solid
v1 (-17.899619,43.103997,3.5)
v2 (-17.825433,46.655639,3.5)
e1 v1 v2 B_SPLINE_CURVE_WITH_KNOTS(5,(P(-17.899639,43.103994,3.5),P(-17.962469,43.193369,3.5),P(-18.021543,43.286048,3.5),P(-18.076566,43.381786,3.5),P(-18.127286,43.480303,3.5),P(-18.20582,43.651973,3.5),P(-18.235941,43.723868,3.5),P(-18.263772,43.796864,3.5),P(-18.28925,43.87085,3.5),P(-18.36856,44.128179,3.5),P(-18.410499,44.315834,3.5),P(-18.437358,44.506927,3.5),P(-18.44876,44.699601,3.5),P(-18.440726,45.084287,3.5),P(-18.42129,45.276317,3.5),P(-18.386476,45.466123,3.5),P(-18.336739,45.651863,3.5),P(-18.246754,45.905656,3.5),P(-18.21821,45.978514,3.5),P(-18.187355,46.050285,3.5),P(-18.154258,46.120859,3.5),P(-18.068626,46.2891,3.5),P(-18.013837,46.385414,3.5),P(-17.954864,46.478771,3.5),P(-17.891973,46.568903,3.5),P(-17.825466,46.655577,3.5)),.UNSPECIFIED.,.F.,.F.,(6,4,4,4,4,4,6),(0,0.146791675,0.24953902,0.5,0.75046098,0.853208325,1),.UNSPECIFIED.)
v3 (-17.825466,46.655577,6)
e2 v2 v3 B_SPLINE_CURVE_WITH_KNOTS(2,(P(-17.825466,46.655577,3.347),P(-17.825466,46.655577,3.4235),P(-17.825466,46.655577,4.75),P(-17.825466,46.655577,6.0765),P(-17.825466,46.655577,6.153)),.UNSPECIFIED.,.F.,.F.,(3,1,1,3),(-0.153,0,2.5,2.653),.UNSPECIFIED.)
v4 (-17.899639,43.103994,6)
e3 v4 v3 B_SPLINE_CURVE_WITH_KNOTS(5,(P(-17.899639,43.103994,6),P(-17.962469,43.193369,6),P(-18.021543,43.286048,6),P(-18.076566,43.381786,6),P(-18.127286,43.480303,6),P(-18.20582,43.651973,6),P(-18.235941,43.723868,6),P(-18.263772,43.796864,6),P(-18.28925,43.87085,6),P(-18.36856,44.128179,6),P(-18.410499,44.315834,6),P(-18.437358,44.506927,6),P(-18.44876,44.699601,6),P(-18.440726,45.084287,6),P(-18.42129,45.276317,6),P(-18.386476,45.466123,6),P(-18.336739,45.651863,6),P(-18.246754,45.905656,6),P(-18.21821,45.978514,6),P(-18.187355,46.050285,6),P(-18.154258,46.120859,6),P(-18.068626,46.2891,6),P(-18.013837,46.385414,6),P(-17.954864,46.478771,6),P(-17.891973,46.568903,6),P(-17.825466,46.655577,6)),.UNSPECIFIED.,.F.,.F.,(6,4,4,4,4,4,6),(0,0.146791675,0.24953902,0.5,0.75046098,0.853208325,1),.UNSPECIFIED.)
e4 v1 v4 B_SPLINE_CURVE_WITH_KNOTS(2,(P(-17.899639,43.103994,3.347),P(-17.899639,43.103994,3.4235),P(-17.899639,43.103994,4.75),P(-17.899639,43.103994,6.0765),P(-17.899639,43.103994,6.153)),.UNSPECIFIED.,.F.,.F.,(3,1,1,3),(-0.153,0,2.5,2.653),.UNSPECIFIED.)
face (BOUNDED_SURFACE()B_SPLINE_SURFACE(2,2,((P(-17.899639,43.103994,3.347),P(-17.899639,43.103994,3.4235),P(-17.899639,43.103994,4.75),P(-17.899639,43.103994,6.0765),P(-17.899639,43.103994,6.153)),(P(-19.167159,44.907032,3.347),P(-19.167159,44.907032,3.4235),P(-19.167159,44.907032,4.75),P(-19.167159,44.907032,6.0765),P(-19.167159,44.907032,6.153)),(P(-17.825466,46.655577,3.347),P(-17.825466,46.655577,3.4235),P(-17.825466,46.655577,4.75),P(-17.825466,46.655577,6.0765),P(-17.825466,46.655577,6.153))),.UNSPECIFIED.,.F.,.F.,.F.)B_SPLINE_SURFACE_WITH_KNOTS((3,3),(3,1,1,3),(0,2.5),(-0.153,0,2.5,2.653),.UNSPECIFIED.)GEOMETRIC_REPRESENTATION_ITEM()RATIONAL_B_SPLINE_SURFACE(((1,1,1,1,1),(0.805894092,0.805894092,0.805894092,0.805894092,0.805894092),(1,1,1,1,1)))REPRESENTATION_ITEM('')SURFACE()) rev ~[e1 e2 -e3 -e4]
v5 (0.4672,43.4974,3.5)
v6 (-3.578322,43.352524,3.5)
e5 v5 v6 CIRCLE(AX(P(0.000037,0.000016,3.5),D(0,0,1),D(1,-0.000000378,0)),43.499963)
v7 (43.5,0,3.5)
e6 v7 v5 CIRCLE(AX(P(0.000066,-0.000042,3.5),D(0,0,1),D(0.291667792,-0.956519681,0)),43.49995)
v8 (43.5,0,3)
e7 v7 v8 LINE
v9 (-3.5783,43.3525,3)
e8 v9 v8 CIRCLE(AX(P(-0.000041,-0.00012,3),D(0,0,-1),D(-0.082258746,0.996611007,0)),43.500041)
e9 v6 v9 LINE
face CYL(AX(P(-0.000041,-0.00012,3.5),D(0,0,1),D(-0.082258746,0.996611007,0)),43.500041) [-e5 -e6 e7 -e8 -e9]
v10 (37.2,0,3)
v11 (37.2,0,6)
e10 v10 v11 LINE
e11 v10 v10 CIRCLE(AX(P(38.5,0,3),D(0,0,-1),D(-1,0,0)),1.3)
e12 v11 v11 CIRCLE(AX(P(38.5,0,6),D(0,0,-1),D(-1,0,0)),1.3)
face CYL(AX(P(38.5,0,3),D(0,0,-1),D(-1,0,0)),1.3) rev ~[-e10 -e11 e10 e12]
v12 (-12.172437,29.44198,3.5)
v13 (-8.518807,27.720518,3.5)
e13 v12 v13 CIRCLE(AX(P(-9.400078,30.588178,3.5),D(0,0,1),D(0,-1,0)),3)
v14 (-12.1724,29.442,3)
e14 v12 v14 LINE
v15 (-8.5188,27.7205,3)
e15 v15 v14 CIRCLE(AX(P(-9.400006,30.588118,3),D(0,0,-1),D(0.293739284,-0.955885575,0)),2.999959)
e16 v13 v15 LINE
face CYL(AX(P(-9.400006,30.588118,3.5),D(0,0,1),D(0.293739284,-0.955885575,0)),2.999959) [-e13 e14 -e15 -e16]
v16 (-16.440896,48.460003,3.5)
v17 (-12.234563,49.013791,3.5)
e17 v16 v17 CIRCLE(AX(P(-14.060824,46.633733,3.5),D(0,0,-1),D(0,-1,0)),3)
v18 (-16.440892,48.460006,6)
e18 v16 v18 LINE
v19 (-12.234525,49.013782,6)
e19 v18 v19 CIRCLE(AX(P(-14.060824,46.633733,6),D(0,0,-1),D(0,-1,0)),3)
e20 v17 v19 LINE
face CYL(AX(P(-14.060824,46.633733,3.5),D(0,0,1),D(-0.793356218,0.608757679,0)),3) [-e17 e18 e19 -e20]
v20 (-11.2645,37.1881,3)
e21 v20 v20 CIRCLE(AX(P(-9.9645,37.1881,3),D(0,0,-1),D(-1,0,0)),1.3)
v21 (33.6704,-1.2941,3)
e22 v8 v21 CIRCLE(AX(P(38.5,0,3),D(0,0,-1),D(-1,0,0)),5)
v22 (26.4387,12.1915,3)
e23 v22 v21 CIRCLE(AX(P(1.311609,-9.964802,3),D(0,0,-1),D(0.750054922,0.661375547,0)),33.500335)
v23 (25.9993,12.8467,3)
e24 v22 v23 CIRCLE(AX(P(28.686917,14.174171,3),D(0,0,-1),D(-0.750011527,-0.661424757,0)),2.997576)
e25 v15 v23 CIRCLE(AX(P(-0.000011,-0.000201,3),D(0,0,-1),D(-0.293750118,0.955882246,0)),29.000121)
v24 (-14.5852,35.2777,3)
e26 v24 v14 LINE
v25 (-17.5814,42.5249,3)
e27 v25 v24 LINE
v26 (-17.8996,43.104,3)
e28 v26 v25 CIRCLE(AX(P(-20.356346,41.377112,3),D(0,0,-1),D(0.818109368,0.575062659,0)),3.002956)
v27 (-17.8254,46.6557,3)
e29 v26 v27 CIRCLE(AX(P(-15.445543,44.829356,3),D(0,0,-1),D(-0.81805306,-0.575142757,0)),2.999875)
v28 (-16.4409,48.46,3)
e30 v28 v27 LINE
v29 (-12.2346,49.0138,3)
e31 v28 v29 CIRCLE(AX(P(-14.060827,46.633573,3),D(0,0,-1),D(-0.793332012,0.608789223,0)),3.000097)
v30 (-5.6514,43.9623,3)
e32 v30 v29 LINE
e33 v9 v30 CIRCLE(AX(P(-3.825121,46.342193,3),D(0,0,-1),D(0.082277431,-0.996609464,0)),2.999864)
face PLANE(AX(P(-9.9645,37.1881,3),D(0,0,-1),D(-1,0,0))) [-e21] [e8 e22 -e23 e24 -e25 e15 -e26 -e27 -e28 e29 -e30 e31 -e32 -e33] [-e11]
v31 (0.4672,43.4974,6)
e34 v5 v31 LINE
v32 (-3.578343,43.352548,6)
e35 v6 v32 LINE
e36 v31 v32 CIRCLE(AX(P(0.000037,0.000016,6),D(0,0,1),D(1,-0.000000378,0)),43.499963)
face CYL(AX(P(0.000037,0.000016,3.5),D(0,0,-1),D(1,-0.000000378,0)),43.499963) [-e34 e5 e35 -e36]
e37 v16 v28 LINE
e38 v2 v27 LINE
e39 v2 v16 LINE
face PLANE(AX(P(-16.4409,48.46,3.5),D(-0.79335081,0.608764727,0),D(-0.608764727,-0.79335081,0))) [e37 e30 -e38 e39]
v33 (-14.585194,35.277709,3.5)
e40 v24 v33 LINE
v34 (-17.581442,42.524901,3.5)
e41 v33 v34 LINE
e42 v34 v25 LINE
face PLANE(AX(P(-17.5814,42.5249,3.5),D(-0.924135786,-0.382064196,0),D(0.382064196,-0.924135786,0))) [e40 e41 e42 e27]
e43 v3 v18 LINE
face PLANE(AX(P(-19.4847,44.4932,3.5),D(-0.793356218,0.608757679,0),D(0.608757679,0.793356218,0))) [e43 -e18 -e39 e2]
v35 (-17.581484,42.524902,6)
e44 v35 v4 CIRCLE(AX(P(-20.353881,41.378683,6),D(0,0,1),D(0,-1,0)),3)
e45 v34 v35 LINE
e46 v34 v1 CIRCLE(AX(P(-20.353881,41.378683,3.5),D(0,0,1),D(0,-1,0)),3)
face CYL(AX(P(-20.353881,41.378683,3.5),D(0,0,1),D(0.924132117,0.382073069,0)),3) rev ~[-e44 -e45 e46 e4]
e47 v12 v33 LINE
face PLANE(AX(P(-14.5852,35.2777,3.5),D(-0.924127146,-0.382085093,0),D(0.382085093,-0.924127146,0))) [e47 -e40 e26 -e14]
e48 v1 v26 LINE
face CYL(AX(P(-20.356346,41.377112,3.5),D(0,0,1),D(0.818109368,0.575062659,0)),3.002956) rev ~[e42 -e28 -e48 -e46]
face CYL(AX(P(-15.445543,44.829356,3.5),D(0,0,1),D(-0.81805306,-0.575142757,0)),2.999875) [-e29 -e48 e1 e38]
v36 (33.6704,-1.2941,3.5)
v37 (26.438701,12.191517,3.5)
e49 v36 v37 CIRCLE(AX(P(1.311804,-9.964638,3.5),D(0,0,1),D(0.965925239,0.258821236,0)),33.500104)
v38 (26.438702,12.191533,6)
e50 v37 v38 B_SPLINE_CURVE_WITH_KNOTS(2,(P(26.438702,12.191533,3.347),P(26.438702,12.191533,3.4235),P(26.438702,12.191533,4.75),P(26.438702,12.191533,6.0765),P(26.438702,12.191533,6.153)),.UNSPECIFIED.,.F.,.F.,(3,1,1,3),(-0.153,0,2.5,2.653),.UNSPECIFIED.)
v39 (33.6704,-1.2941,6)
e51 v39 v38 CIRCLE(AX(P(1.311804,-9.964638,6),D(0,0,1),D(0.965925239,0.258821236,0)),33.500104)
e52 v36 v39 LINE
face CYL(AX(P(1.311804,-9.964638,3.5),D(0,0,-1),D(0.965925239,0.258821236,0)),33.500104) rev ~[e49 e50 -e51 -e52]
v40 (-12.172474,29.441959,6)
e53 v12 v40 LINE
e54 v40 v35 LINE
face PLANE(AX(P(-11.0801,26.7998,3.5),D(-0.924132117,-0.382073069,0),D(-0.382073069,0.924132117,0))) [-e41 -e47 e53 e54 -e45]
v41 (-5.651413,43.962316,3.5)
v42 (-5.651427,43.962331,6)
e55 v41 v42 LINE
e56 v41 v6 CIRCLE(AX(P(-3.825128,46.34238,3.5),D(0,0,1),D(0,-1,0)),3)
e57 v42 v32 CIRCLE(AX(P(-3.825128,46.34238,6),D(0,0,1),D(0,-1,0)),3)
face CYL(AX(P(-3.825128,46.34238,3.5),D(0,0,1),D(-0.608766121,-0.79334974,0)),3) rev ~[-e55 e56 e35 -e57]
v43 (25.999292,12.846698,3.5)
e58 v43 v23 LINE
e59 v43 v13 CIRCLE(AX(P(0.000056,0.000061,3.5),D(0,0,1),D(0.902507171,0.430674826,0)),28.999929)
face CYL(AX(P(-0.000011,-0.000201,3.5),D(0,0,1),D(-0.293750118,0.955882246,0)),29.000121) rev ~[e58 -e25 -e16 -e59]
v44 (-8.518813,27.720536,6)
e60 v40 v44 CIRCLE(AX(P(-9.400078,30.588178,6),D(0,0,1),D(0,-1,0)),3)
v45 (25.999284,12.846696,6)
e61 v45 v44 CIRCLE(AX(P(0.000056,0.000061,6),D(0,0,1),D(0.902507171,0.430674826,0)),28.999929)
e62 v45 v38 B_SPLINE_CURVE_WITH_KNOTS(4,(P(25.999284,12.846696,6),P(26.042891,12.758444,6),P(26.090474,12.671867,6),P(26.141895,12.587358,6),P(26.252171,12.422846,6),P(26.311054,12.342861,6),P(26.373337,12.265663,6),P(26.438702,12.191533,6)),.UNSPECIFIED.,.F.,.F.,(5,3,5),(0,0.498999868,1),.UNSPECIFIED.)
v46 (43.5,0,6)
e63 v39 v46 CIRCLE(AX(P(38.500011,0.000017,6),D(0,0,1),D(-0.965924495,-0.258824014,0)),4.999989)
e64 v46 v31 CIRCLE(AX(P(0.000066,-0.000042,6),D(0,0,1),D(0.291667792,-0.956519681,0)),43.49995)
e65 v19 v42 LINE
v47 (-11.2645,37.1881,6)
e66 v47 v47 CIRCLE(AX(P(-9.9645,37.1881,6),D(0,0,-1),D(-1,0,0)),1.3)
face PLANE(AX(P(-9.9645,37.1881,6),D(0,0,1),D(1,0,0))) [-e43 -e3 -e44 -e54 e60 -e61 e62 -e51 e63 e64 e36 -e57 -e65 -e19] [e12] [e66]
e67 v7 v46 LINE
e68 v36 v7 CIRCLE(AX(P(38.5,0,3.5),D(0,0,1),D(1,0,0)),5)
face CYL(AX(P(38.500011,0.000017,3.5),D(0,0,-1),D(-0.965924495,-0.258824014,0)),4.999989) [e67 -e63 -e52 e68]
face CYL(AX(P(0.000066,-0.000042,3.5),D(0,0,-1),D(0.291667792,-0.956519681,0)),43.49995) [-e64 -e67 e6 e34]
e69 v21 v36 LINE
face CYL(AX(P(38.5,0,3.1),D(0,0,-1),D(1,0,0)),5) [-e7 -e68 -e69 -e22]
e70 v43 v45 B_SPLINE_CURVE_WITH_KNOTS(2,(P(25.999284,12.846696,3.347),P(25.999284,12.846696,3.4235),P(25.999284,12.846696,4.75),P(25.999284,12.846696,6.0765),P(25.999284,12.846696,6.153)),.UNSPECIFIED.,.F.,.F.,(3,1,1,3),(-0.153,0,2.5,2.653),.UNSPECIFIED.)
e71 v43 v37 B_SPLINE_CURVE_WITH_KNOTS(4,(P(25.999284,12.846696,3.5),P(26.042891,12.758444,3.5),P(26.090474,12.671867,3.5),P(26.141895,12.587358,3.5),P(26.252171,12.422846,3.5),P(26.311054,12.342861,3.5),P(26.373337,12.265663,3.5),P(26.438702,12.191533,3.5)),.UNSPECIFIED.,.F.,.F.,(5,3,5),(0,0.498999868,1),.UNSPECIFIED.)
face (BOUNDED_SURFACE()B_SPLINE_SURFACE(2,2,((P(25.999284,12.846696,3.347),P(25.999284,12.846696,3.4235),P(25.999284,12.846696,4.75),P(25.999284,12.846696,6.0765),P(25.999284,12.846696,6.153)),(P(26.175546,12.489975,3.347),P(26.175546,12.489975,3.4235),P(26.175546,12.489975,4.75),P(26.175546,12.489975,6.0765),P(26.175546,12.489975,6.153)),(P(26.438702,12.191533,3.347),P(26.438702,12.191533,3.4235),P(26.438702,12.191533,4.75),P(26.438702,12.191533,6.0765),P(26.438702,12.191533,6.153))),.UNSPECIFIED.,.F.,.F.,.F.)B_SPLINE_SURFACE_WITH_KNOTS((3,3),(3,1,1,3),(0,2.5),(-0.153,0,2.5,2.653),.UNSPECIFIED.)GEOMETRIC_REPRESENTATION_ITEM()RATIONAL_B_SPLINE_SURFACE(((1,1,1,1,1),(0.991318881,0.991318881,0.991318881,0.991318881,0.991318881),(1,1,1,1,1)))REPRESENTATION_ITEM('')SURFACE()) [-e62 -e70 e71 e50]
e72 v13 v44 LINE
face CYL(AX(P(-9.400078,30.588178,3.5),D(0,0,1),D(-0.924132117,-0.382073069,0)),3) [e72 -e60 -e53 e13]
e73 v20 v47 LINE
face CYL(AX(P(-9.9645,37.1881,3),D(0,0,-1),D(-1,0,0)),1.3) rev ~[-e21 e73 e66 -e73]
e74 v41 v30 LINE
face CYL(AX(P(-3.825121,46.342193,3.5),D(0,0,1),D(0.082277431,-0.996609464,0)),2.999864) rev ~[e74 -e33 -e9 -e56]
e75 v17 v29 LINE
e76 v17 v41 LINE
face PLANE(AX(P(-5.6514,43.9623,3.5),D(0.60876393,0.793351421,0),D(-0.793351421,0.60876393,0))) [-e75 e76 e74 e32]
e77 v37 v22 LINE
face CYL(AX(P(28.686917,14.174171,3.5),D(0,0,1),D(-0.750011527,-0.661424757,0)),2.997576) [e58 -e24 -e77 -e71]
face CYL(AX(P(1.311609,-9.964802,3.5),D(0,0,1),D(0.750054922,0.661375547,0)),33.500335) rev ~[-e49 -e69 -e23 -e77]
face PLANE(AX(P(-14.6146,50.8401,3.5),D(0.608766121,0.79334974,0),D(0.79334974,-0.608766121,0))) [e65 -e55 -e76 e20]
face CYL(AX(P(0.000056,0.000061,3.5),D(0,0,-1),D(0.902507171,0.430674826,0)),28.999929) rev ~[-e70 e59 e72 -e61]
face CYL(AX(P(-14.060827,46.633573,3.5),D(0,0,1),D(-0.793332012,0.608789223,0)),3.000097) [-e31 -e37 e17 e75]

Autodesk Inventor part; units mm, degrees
ref_plane "YZ Plane" through (0, 0, 0) normal (1, 0, 0) x (0, 1, 0)
ref_plane "XZ Plane" through (0, 0, 0) normal (0, 1, 0) x (-1, 0, 0)
ref_plane "XY Plane" through (0, 0, 0) normal (0, 0, 1) x (1, 0, 0)
sketch "スケッチ1" plane through (0, 0, 0) normal (0, 0, 1) x (1, 0, 0)
  circle A0 centre (0, 0) radius 33.5 construction
  circle A1 centre (0, 0) radius 43.5
  dimension "d0" = 67
  dimension "d1" = 87
extrude "押し出し1" add sketch "スケッチ1" along normal blind 1
sketch "スケッチ2" plane through (0, 0, 1) normal (0, 0, 1) x (1, 0, 0)
  circle A0 centre (0, 0) radius 33.5
  circle A1 centre (0, 0) radius 43.5 projected
  dimension "d4" = 67
extrude "押し出し2" add sketch "スケッチ2" along normal blind 2
sketch "スケッチ4" plane through (0, 0, 3) normal (0, 0, 1) x (1, 0, 0)
  circle A0 centre (0, 0) radius 33.5 construction
  circle A1 centre (0, 0) radius 43.5 construction
  line L0 (0, 0) -> (33.5, 0) construction
  line L1 (33.5, 0) -> (43.5, 0) construction
  circle A2 centre (0, 0) radius 33.5 construction
  line L2 (0, 0) -> (-33.5, 0) construction
  circle A3 centre (0, 0) radius 43.5 construction
  line L3 (-43.5, 0) -> (-33.5, 0) construction
  circle A4 centre (38.5, 0) radius 3.05
  circle A5 centre (-38.5, 0) radius 3.05
  circle A6 centre (0, 0) radius 38.5 construction
  circle A7 centre (-9.9645, 37.1881) radius 3.05 construction
  arc A8 (-3.4944, 44.3648) -> (-9.9645, 37.1881) centre (38.5, 0) ccw construction
  line L4 (38.5, 0) -> (-9.9645, 37.1881) construction
  line L5 (-9.9645, 37.1881) -> (-12.3843, 39.0449) construction
  arc A9 (0.0788, 43.4999) -> (-7.5448, 35.3314) centre (38.5, 0) ccw
  arc A10 (-9.6001, 42.4274) -> (-12.3843, 39.0449) centre (38.5, 0) ccw
  arc A11 (-12.3843, 39.0449) -> (-7.5448, 35.3314) centre (-9.9645, 37.1881) ccw
  arc A12 (0.0788, 43.4999) -> (-9.6001, 42.4274) centre (0, 0) ccw
  circle A13 centre (9.9645, -37.1881) radius 3.05 construction
  line L6 (-38.5, 0) -> (9.9645, -37.1881) construction
  line L7 (9.9645, -37.1881) -> (12.3843, -39.0449) construction
  arc A14 (-0.0788, -43.4999) -> (7.5448, -35.3314) centre (-38.5, 0) ccw
  arc A15 (9.6001, -42.4274) -> (12.3843, -39.0449) centre (-38.5, 0) ccw
  arc A16 (12.3843, -39.0449) -> (7.5448, -35.3314) centre (9.9645, -37.1881) ccw
  arc A17 (-0.0788, -43.4999) -> (9.6001, -42.4274) centre (0, 0) ccw
  line L8 (-9.9645, 37.1881) -> (9.9645, -37.1881) construction
  dimension "d7" = 6.1
  dimension "d8" = 3.05
  dimension "d15" = 105
extrude "押し出し3" cut sketch "スケッチ4" against normal through all
fillet "フィレット1" radius 1 4 edges at (-9.6001, 42.4274, 1.5) (0.0788, 43.4999, 1.5) (-0.0788, -43.4999, 1.5) (9.6001, -42.4274, 1.5)
sketch "スケッチ6" plane through (0, 0, 3) normal (0, 0, 1) x (1, 0, 0)
  arc A0 (-12.3843, 39.0449) -> (-7.5448, 35.3314) centre (-9.9645, 37.1881) ccw construction
  circle A1 centre (38.5, 0) radius 3.05 construction
  circle A2 centre (-9.9645, 37.1881) radius 3
  circle A3 centre (38.5, 0) radius 3
  point P0 (0, 0)
  dimension "d16" = 6
extrude "押し出し5" add sketch "スケッチ6" along normal blind 0.1
sketch "スケッチ7" plane through (-9.9645, 37.1881, 3.1) normal (0, 0, 1) x (1, 0, 0)
  circle A0 centre (0, 0) radius 3 construction
  circle A1 centre (48.4645, -37.1881) radius 3 construction
  circle A2 centre (0, 0) radius 5
  circle A3 centre (48.4645, -37.1881) radius 3 projected
  circle A4 centre (48.4645, -37.1881) radius 5
  point P0 (9.9645, -37.1881)
  dimension "d19" = 10
extrude "押し出し6" add sketch "スケッチ7" along normal blind 0.4 contours A2 | A3 | A4
sketch "スケッチ8" plane through (-9.9645, 37.1881, 3.5) normal (0, 0, 1) x (1, 0, 0)
  circle A0 centre (9.9645, -37.1881) radius 33.5 construction
  circle A1 centre (9.9645, -37.1881) radius 29 construction
  circle A2 centre (48.4645, -37.1881) radius 5 construction
  arc A3 (43.6349, -38.4822) -> (36.1372, -24.6985) centre (11.2764, -47.1527) ccw construction
  line L0 (9.9645, -37.1881) -> (48.4645, -37.1881) construction
  line L1 (48.4645, -37.1881) -> (11.2764, -47.1527) construction
  circle A4 centre (0, 0) radius 5 construction
  circle A5 centre (48.4645, -37.1881) radius 3.05 construction
  line L2 (48.4645, -37.1881) -> (-9.5202, 7.3051) construction
  line L3 (9.9645, -37.1881) -> (-4.6207, -1.9104) construction
  circle A6 centre (0, 0) radius 5 construction
  line L4 (-1.1156, -10.3883) -> (-7.9245, 6.0806)
  arc A7 (36.1372, -24.6985) -> (-1.1156, -10.3883) centre (9.9645, -37.1881) ccw
  arc A8 (43.6349, -38.4822) -> (36.1372, -24.6985) centre (11.2764, -47.1527) ccw
  arc A9 (22.6521, -78.7967) -> (10.4317, 6.3093) centre (9.9645, -37.1881) ccw projected
  arc A10 (43.6349, -38.4822) -> (53.4645, -37.1881) centre (48.4645, -37.1881) ccw
  arc A11 (53.4645, -37.1881) -> (5.2496, 6.0556) centre (9.9645, -37.1881) ccw
  line L5 (-7.9245, 6.0806) -> (-9.5202, 7.3051)
  line L6 (-9.5202, 7.3051) -> (-4.6501, 13.652)
  line L7 (-4.6501, 13.652) -> (5.2496, 6.0556)
  point P0 (10.4317, 6.3093)
  dimension "d22" = 58
  dimension "d23" = 15
  dimension "d24" = 12
  dimension "d25" = 8
extrude "押し出し7" add sketch "スケッチ8" along normal blind 2.5
sketch "スケッチ9" plane through (0, 0, 3) normal (0, 0, 1) x (1, 0, 0)
  circle A0 centre (0, 0) radius 61.8319
extrude "押し出し8" cut sketch "スケッチ9" against normal through all
sketch "スケッチ10" plane through (-9.9645, 37.1881, 3) normal (0, 0, -1) x (-1, 0, 0)
  circle A0 centre (-48.4645, -37.1881) radius 3 construction
  circle A1 centre (0, 0) radius 3 construction
  circle A2 centre (-48.4645, -37.1881) radius 1.3
  circle A3 centre (0, 0) radius 1.3
  point P0 (-9.9645, -37.1881)
  dimension "d30" = 2.6
extrude "押し出し9" cut sketch "スケッチ10" against normal through all
fillet "フィレット2" radius 3 6 edges at (-19.4848, 44.4933, 4.75) (-14.6147, 50.8401, 4.75) (-17.889, 43.2688, 4.75) (-4.7149, 43.2437, 4.75) (-11.0801, 26.7998, 4.75) (26.1727, 12.4896, 4.75)
sketch "スケッチ11" plane through (38.5, 0, 3) normal (0, 0, -1) x (-1, 0, 0)
  circle A0 centre (0, 0) radius 3 projected
  circle A1 centre (0, 0) radius 5 projected
  circle A2 centre (48.4645, 37.1881) radius 3 projected
  circle A3 centre (48.4645, 37.1881) radius 5 projected
  point P0 (38.5, 0)
extrude "押し出し10" add sketch "スケッチ11" against normal up to surface (0.1 mm away)
sketch "スケッチ12" plane through (-9.9645, 37.1881, 3.5) normal (0, 0, -1) x (-1, 0, 0)
  arc A0 (7.9351, 5.9159) -> (7.8609, 9.4676) centre (5.4809, 7.6413) ccw projected
  line L0 (6.4764, 11.2719) -> (7.8609, 9.4676) projected
  arc A1 (6.4764, 11.2719) -> (2.2701, 11.8257) centre (4.0964, 9.4456) ccw projected
  line L1 (-4.3131, 6.7742) -> (2.2701, 11.8257) projected
  arc A2 (-6.3862, 6.1644) -> (-4.3131, 6.7742) centre (-6.1394, 9.1543) ccw projected
  arc A3 (-6.3862, 6.1644) -> (-53.4645, -37.1881) centre (-9.9645, -37.1881) ccw projected
  arc A4 (-43.6349, -38.4822) -> (-53.4645, -37.1881) centre (-48.4645, -37.1881) ccw projected
  arc A5 (-36.4032, -24.9966) -> (-43.6349, -38.4822) centre (-11.2764, -47.1527) ccw projected
  arc A6 (-36.4032, -24.9966) -> (-35.9638, -24.3414) centre (-38.6534, -23.0124) ccw projected
  arc A7 (-1.4457, -9.4676) -> (-35.9638, -24.3414) centre (-9.9645, -37.1881) ccw projected
  arc A8 (-1.4457, -9.4676) -> (2.2079, -7.7461) centre (-0.5645, -6.5999) ccw projected
  line L2 (4.6207, -1.9104) -> (2.2079, -7.7461) projected
  circle A9 centre (0, 0) radius 5 projected
  line L3 (7.6169, 5.3368) -> (4.6207, -1.9104) projected
  arc A10 (7.9351, 5.9159) -> (7.6169, 5.3368) centre (10.3893, 4.1906) ccw projected
extrude "押し出し11" add sketch "スケッチ12" along normal up to surface (0.5 mm away)
ref_plane "作業平面1" through (-8.5188, 27.7206, 3.5) normal (-0.5666562, -0.8239543, 0) x (0, 0, -1)
properties part number "canere_02_t3_01"
